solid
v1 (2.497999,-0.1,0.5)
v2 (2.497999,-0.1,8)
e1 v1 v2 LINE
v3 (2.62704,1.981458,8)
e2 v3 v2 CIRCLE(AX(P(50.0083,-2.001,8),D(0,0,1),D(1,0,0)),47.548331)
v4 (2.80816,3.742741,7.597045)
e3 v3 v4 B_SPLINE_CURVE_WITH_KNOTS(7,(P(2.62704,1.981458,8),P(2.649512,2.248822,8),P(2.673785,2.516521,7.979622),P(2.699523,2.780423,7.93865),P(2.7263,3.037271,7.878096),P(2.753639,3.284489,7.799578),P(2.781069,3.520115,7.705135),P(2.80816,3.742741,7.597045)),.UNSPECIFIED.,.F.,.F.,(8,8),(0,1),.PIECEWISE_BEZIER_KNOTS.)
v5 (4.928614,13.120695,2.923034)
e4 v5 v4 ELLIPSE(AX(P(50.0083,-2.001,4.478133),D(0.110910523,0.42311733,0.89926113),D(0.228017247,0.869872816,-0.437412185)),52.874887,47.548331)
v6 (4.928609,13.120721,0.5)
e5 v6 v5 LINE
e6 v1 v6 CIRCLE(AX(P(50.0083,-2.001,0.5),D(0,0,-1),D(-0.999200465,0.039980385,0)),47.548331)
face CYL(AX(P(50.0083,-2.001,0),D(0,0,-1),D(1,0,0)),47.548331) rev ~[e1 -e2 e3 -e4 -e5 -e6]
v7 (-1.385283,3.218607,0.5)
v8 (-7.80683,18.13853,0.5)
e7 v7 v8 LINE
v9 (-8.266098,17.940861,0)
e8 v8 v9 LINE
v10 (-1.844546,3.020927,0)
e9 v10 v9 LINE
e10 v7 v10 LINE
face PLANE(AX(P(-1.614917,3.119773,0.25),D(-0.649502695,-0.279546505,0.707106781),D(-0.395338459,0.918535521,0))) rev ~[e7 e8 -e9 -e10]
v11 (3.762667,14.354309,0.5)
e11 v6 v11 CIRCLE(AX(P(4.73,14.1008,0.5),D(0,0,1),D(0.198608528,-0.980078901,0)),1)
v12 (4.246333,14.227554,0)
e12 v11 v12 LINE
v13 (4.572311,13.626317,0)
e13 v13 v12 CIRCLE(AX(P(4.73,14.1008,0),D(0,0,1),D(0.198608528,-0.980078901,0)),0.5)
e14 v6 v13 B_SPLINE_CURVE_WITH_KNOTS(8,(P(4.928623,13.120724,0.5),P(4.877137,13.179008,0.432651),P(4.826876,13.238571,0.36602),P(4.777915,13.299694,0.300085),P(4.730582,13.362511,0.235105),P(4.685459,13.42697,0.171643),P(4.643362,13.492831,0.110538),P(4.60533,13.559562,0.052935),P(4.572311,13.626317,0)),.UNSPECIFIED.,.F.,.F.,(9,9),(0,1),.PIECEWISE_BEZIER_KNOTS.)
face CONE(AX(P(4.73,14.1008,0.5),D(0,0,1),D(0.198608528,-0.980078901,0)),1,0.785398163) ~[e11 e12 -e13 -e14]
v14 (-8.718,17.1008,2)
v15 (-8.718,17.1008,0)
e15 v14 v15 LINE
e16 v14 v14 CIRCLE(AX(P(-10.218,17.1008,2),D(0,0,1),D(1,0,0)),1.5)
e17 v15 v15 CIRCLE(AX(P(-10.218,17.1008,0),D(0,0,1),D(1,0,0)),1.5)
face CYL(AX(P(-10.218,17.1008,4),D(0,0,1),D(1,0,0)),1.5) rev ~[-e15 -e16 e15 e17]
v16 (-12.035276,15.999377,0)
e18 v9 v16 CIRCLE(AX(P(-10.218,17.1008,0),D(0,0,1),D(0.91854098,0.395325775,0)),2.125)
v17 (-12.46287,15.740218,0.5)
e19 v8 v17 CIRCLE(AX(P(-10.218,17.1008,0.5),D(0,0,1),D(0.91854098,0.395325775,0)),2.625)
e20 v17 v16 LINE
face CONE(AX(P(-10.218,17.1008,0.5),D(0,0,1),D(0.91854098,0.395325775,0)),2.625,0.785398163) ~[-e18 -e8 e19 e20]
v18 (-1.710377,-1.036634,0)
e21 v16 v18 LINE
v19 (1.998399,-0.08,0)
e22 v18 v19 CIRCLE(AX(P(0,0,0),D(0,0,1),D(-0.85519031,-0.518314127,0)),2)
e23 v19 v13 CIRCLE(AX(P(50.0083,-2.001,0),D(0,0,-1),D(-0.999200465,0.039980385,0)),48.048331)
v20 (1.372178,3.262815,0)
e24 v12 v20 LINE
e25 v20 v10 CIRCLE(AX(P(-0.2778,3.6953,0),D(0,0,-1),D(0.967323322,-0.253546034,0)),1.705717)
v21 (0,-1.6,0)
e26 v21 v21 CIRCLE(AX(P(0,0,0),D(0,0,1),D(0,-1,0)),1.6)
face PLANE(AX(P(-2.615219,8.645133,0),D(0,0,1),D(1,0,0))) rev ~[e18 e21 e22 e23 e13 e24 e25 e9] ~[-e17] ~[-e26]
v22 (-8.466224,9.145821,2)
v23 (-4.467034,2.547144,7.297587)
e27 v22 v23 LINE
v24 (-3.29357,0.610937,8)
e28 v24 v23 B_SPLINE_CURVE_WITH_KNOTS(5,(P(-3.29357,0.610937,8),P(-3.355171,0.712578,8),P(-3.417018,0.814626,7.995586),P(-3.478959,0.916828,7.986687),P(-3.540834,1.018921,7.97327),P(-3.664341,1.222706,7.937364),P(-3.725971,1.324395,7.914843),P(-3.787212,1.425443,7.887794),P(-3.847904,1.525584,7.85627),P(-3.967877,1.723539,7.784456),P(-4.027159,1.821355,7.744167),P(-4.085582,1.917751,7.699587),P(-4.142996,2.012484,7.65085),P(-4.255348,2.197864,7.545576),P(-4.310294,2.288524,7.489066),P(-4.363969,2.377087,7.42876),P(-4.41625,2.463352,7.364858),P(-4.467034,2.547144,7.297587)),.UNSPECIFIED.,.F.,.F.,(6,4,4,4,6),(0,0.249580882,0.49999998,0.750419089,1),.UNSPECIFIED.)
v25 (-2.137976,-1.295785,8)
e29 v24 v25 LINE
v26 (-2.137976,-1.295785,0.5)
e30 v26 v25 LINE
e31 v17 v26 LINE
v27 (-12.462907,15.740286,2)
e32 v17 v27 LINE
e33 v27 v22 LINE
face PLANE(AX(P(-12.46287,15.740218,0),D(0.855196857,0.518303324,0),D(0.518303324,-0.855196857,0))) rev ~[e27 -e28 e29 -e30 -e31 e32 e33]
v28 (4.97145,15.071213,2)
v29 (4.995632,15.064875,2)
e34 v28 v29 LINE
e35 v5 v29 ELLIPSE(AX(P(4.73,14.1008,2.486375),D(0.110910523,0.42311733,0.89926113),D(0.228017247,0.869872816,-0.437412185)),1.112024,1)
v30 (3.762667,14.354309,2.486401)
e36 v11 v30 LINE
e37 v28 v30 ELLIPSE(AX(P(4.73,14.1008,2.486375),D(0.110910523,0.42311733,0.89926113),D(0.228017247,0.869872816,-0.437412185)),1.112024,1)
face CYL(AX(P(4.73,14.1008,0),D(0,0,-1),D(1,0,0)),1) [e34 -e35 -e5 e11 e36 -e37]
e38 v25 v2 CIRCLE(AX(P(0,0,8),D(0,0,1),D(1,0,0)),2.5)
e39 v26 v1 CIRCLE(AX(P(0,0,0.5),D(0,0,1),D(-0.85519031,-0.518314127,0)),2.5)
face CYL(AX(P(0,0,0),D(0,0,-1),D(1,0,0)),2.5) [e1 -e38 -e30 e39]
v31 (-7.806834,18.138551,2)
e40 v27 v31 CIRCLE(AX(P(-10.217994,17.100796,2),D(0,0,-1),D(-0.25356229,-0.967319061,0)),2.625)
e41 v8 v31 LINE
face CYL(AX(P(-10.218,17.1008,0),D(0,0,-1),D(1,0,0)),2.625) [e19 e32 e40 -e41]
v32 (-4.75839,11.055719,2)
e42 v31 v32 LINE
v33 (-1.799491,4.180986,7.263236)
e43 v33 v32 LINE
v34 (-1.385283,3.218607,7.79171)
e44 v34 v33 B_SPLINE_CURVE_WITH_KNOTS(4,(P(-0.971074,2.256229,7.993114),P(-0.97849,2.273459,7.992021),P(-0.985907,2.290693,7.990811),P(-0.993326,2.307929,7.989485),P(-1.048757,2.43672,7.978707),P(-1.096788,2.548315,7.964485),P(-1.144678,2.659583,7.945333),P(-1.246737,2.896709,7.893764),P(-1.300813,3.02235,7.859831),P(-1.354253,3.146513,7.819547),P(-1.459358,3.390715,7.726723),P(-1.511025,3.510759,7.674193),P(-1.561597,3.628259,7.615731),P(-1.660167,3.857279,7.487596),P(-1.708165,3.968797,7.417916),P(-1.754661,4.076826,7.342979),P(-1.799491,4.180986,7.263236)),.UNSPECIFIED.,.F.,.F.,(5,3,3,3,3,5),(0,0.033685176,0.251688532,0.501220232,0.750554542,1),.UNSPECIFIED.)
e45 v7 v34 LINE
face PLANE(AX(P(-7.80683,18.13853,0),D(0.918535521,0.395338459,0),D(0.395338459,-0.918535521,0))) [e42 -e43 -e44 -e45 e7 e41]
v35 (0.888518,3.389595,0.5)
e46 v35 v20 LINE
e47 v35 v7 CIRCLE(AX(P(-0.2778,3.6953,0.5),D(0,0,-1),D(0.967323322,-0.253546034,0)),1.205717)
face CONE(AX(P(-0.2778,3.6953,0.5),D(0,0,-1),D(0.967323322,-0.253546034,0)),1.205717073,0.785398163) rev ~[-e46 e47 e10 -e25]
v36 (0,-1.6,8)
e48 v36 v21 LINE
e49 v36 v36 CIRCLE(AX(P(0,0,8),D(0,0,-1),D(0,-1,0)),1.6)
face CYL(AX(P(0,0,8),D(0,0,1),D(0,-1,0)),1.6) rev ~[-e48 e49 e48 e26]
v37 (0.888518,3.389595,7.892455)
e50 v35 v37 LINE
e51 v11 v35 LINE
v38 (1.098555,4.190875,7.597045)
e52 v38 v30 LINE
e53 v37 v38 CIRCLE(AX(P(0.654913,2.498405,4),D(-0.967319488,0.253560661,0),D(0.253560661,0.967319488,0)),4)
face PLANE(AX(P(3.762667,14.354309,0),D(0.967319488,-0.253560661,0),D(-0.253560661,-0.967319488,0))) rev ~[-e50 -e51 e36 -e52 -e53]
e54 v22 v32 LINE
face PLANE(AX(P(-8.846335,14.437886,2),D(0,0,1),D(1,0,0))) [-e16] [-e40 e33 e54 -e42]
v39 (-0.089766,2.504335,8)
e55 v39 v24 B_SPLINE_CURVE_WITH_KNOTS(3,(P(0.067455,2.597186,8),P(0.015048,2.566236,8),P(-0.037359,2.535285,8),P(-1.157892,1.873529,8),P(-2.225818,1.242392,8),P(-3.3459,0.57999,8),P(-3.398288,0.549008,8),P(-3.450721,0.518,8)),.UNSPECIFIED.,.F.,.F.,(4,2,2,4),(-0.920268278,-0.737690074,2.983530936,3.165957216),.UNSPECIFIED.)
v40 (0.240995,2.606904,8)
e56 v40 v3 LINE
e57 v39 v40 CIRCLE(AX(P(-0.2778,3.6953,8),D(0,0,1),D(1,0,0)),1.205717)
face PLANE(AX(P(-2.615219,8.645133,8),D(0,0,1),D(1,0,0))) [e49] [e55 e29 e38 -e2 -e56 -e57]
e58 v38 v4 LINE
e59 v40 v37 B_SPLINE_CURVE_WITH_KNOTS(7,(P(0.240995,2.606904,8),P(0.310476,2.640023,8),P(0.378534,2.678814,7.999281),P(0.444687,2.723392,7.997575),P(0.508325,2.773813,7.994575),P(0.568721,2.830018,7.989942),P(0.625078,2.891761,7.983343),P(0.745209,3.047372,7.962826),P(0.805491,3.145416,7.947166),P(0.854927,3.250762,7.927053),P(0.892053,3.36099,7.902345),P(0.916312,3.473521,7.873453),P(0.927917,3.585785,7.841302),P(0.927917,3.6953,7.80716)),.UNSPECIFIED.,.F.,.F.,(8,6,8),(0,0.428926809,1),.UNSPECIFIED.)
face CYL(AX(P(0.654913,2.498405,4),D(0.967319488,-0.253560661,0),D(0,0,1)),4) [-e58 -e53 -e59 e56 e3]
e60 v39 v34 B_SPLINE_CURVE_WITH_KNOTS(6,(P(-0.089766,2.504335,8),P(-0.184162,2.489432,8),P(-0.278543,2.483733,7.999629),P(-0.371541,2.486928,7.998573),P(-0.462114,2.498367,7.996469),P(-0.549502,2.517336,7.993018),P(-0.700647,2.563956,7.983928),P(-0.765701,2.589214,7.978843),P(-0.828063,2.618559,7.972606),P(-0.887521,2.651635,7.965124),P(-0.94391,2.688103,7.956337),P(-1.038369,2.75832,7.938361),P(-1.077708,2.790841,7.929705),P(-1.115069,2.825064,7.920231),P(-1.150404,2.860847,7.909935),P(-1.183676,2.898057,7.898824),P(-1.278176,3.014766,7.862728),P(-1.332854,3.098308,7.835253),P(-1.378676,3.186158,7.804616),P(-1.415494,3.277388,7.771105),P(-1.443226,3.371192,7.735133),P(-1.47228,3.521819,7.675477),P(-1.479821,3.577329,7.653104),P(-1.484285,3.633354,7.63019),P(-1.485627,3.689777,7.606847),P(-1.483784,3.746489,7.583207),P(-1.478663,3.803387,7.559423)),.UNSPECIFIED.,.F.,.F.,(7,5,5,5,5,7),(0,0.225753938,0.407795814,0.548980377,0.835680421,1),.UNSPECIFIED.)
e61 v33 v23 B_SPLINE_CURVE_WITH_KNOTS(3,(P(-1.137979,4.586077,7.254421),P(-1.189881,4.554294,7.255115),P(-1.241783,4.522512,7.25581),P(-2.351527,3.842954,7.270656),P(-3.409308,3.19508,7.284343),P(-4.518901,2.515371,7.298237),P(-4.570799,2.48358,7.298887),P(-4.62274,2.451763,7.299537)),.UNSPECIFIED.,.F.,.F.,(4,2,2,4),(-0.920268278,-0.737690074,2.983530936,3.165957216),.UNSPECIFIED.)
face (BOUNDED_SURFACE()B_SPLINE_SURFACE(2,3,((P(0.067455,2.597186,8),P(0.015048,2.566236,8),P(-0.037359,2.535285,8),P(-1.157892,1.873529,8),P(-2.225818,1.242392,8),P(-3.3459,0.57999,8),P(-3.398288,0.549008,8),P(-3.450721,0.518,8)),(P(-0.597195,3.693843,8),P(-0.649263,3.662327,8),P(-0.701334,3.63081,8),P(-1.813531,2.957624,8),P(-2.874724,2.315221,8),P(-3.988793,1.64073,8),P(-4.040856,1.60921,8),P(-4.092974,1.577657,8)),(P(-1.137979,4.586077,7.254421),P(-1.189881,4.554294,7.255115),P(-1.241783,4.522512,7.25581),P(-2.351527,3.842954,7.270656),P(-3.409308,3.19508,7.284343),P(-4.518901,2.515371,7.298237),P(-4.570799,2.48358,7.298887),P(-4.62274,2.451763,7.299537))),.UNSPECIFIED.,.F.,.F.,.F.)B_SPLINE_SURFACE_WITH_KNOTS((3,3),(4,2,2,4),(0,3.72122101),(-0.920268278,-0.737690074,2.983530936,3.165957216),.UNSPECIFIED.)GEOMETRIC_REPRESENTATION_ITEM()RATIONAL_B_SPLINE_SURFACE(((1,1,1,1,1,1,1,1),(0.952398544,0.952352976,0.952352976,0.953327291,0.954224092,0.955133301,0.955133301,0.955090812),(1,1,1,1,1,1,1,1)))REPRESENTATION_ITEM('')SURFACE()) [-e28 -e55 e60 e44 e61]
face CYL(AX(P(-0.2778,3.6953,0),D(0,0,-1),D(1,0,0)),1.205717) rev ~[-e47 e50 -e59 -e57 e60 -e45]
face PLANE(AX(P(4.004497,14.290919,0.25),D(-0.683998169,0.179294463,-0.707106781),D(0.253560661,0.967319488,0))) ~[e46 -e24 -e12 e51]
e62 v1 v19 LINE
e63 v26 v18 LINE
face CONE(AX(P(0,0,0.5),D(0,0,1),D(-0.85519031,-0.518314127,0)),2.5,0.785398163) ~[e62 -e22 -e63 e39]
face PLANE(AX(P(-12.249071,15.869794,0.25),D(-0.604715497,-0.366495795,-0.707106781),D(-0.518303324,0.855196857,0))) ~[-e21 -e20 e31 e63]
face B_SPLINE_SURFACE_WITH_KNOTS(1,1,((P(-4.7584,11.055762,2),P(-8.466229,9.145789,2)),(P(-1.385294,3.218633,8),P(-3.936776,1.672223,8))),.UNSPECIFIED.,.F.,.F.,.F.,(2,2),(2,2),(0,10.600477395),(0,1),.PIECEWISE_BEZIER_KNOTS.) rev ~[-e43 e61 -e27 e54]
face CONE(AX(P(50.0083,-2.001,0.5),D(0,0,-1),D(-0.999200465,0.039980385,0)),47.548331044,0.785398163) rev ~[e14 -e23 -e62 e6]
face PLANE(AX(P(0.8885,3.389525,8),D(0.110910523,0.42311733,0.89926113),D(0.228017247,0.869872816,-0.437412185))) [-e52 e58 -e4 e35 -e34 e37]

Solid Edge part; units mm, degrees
sketch "Sketch1" plane through (0, 0, 0) normal (0, 0, 1) x (1, 0, 0)
  line L0 (-12.4629, 15.7402) -> (-2.138, -1.2958)
  arc A0 (-2.138, -1.2958) -> (2.498, -0.1) centre (0, 0) ccw
  arc A1 (4.9286, 13.1207) -> (2.498, -0.1) centre (50.0083, -2.001) ccw
  line L1 (3.7627, 14.3543) -> (0.8885, 3.3896)
  arc A2 (-1.3853, 3.2186) -> (0.8885, 3.3896) centre (-0.2778, 3.6953) ccw
  line L2 (-7.8069, 18.1385) -> (-1.3853, 3.2186)
  arc A3 (3.7627, 14.3543) -> (4.9286, 13.1207) centre (4.73, 14.1008) cw
  arc A4 (-12.4629, 15.7402) -> (-7.8068, 18.1385) centre (-10.218, 17.1008) cw
extrude "Protrusion1" add sketch "Sketch1" along normal blind 8
hole "Agujero_1" at (0, 0, 8) direction (0, 0, -1) diameter 3.2 end up to next
sketch "Sketch2" plane through (-3.5565, 8.6129, 8) normal (0, 0, 1) x (-0.2535623, -0.9673191, 0)
  line L0 (0.7294, -4.8844) -> (-2.0582, -1.782)
  line L1 (-8.1366, -6.5268) -> (-2.0582, -1.782)
  arc A0 (-4.6361, -10.4226) -> (-8.1366, -6.5268) centre (-6.5214, -8.596) cw
  line L2 (-4.6361, -10.4226) -> (0.7294, -4.8844)
extrude "VaciadoExtruido_3" cut sketch "Sketch2" against normal blind 6
chamfer "Chaflán_5" distance 0.5 angle 45 8 edges at (-7.3004, 7.2222, 0) (0.6244, -2.4208, 0) (3.2438, 6.5967, 0) (-11.4201, 19.4344, 0) (-4.5961, 10.6786, 0) (-0.1874, 2.493, 0) (2.3256, 8.8719, 0) (5.4568, 14.7876, 0)
sketch "Sketch3" plane through (0, 0, 4) normal (0, 0, 1) x (1, 0, 0)
  circle A0 centre (-10.218, 17.1008) radius 1.5
extrude "Cutout1" cut sketch "Sketch3" against normal through all
sketch "Sketch4" plane through (2.3256, 8.8719, 4.75) normal (-0.9673191, 0.2535623, 0) x (-0.2535623, -0.9673191, 0)
  line L0 (5.6676, 3.25) -> (-6.6676, -2.75)
extrude "Cutout2" cut sketch "Sketch4" against normal through all material side at (2.4579, 9.3767, 5.045)
sketch "Sketch5" plane through (-4.5961, 10.6786, 4.25) normal (0.9185349, 0.3953399, 0) x (-0.3953399, 0.9185349, 0)
  line L0 (0.4106, 3.75) -> (0.4106, -2.25)
  line L1 (-8.1216, 3.75) -> (0.4106, -2.25)
  line L2 (-8.1216, 3.75) -> (0.4106, 3.75)
sketch "Sketch6" plane through (-7.3004, 7.2222, 4.25) normal (-0.8551957, -0.5183052, 0) x (0.5183052, -0.8551957, 0)
  line L0 (6.4897, 3.75) -> (-2.2493, 3.75)
  line L1 (-2.2493, 3.75) -> (-2.2493, -2.25)
  line L2 (-2.2493, -2.25) -> (6.4897, 3.75)
loft "LoftedCutout1" cut profiles "Sketch5", "Sketch6"
fillet "Redondeo_6" radius 4 2 edges at (-2.6611, 2.4454, 8) (1.8014, 3.1503, 8)
